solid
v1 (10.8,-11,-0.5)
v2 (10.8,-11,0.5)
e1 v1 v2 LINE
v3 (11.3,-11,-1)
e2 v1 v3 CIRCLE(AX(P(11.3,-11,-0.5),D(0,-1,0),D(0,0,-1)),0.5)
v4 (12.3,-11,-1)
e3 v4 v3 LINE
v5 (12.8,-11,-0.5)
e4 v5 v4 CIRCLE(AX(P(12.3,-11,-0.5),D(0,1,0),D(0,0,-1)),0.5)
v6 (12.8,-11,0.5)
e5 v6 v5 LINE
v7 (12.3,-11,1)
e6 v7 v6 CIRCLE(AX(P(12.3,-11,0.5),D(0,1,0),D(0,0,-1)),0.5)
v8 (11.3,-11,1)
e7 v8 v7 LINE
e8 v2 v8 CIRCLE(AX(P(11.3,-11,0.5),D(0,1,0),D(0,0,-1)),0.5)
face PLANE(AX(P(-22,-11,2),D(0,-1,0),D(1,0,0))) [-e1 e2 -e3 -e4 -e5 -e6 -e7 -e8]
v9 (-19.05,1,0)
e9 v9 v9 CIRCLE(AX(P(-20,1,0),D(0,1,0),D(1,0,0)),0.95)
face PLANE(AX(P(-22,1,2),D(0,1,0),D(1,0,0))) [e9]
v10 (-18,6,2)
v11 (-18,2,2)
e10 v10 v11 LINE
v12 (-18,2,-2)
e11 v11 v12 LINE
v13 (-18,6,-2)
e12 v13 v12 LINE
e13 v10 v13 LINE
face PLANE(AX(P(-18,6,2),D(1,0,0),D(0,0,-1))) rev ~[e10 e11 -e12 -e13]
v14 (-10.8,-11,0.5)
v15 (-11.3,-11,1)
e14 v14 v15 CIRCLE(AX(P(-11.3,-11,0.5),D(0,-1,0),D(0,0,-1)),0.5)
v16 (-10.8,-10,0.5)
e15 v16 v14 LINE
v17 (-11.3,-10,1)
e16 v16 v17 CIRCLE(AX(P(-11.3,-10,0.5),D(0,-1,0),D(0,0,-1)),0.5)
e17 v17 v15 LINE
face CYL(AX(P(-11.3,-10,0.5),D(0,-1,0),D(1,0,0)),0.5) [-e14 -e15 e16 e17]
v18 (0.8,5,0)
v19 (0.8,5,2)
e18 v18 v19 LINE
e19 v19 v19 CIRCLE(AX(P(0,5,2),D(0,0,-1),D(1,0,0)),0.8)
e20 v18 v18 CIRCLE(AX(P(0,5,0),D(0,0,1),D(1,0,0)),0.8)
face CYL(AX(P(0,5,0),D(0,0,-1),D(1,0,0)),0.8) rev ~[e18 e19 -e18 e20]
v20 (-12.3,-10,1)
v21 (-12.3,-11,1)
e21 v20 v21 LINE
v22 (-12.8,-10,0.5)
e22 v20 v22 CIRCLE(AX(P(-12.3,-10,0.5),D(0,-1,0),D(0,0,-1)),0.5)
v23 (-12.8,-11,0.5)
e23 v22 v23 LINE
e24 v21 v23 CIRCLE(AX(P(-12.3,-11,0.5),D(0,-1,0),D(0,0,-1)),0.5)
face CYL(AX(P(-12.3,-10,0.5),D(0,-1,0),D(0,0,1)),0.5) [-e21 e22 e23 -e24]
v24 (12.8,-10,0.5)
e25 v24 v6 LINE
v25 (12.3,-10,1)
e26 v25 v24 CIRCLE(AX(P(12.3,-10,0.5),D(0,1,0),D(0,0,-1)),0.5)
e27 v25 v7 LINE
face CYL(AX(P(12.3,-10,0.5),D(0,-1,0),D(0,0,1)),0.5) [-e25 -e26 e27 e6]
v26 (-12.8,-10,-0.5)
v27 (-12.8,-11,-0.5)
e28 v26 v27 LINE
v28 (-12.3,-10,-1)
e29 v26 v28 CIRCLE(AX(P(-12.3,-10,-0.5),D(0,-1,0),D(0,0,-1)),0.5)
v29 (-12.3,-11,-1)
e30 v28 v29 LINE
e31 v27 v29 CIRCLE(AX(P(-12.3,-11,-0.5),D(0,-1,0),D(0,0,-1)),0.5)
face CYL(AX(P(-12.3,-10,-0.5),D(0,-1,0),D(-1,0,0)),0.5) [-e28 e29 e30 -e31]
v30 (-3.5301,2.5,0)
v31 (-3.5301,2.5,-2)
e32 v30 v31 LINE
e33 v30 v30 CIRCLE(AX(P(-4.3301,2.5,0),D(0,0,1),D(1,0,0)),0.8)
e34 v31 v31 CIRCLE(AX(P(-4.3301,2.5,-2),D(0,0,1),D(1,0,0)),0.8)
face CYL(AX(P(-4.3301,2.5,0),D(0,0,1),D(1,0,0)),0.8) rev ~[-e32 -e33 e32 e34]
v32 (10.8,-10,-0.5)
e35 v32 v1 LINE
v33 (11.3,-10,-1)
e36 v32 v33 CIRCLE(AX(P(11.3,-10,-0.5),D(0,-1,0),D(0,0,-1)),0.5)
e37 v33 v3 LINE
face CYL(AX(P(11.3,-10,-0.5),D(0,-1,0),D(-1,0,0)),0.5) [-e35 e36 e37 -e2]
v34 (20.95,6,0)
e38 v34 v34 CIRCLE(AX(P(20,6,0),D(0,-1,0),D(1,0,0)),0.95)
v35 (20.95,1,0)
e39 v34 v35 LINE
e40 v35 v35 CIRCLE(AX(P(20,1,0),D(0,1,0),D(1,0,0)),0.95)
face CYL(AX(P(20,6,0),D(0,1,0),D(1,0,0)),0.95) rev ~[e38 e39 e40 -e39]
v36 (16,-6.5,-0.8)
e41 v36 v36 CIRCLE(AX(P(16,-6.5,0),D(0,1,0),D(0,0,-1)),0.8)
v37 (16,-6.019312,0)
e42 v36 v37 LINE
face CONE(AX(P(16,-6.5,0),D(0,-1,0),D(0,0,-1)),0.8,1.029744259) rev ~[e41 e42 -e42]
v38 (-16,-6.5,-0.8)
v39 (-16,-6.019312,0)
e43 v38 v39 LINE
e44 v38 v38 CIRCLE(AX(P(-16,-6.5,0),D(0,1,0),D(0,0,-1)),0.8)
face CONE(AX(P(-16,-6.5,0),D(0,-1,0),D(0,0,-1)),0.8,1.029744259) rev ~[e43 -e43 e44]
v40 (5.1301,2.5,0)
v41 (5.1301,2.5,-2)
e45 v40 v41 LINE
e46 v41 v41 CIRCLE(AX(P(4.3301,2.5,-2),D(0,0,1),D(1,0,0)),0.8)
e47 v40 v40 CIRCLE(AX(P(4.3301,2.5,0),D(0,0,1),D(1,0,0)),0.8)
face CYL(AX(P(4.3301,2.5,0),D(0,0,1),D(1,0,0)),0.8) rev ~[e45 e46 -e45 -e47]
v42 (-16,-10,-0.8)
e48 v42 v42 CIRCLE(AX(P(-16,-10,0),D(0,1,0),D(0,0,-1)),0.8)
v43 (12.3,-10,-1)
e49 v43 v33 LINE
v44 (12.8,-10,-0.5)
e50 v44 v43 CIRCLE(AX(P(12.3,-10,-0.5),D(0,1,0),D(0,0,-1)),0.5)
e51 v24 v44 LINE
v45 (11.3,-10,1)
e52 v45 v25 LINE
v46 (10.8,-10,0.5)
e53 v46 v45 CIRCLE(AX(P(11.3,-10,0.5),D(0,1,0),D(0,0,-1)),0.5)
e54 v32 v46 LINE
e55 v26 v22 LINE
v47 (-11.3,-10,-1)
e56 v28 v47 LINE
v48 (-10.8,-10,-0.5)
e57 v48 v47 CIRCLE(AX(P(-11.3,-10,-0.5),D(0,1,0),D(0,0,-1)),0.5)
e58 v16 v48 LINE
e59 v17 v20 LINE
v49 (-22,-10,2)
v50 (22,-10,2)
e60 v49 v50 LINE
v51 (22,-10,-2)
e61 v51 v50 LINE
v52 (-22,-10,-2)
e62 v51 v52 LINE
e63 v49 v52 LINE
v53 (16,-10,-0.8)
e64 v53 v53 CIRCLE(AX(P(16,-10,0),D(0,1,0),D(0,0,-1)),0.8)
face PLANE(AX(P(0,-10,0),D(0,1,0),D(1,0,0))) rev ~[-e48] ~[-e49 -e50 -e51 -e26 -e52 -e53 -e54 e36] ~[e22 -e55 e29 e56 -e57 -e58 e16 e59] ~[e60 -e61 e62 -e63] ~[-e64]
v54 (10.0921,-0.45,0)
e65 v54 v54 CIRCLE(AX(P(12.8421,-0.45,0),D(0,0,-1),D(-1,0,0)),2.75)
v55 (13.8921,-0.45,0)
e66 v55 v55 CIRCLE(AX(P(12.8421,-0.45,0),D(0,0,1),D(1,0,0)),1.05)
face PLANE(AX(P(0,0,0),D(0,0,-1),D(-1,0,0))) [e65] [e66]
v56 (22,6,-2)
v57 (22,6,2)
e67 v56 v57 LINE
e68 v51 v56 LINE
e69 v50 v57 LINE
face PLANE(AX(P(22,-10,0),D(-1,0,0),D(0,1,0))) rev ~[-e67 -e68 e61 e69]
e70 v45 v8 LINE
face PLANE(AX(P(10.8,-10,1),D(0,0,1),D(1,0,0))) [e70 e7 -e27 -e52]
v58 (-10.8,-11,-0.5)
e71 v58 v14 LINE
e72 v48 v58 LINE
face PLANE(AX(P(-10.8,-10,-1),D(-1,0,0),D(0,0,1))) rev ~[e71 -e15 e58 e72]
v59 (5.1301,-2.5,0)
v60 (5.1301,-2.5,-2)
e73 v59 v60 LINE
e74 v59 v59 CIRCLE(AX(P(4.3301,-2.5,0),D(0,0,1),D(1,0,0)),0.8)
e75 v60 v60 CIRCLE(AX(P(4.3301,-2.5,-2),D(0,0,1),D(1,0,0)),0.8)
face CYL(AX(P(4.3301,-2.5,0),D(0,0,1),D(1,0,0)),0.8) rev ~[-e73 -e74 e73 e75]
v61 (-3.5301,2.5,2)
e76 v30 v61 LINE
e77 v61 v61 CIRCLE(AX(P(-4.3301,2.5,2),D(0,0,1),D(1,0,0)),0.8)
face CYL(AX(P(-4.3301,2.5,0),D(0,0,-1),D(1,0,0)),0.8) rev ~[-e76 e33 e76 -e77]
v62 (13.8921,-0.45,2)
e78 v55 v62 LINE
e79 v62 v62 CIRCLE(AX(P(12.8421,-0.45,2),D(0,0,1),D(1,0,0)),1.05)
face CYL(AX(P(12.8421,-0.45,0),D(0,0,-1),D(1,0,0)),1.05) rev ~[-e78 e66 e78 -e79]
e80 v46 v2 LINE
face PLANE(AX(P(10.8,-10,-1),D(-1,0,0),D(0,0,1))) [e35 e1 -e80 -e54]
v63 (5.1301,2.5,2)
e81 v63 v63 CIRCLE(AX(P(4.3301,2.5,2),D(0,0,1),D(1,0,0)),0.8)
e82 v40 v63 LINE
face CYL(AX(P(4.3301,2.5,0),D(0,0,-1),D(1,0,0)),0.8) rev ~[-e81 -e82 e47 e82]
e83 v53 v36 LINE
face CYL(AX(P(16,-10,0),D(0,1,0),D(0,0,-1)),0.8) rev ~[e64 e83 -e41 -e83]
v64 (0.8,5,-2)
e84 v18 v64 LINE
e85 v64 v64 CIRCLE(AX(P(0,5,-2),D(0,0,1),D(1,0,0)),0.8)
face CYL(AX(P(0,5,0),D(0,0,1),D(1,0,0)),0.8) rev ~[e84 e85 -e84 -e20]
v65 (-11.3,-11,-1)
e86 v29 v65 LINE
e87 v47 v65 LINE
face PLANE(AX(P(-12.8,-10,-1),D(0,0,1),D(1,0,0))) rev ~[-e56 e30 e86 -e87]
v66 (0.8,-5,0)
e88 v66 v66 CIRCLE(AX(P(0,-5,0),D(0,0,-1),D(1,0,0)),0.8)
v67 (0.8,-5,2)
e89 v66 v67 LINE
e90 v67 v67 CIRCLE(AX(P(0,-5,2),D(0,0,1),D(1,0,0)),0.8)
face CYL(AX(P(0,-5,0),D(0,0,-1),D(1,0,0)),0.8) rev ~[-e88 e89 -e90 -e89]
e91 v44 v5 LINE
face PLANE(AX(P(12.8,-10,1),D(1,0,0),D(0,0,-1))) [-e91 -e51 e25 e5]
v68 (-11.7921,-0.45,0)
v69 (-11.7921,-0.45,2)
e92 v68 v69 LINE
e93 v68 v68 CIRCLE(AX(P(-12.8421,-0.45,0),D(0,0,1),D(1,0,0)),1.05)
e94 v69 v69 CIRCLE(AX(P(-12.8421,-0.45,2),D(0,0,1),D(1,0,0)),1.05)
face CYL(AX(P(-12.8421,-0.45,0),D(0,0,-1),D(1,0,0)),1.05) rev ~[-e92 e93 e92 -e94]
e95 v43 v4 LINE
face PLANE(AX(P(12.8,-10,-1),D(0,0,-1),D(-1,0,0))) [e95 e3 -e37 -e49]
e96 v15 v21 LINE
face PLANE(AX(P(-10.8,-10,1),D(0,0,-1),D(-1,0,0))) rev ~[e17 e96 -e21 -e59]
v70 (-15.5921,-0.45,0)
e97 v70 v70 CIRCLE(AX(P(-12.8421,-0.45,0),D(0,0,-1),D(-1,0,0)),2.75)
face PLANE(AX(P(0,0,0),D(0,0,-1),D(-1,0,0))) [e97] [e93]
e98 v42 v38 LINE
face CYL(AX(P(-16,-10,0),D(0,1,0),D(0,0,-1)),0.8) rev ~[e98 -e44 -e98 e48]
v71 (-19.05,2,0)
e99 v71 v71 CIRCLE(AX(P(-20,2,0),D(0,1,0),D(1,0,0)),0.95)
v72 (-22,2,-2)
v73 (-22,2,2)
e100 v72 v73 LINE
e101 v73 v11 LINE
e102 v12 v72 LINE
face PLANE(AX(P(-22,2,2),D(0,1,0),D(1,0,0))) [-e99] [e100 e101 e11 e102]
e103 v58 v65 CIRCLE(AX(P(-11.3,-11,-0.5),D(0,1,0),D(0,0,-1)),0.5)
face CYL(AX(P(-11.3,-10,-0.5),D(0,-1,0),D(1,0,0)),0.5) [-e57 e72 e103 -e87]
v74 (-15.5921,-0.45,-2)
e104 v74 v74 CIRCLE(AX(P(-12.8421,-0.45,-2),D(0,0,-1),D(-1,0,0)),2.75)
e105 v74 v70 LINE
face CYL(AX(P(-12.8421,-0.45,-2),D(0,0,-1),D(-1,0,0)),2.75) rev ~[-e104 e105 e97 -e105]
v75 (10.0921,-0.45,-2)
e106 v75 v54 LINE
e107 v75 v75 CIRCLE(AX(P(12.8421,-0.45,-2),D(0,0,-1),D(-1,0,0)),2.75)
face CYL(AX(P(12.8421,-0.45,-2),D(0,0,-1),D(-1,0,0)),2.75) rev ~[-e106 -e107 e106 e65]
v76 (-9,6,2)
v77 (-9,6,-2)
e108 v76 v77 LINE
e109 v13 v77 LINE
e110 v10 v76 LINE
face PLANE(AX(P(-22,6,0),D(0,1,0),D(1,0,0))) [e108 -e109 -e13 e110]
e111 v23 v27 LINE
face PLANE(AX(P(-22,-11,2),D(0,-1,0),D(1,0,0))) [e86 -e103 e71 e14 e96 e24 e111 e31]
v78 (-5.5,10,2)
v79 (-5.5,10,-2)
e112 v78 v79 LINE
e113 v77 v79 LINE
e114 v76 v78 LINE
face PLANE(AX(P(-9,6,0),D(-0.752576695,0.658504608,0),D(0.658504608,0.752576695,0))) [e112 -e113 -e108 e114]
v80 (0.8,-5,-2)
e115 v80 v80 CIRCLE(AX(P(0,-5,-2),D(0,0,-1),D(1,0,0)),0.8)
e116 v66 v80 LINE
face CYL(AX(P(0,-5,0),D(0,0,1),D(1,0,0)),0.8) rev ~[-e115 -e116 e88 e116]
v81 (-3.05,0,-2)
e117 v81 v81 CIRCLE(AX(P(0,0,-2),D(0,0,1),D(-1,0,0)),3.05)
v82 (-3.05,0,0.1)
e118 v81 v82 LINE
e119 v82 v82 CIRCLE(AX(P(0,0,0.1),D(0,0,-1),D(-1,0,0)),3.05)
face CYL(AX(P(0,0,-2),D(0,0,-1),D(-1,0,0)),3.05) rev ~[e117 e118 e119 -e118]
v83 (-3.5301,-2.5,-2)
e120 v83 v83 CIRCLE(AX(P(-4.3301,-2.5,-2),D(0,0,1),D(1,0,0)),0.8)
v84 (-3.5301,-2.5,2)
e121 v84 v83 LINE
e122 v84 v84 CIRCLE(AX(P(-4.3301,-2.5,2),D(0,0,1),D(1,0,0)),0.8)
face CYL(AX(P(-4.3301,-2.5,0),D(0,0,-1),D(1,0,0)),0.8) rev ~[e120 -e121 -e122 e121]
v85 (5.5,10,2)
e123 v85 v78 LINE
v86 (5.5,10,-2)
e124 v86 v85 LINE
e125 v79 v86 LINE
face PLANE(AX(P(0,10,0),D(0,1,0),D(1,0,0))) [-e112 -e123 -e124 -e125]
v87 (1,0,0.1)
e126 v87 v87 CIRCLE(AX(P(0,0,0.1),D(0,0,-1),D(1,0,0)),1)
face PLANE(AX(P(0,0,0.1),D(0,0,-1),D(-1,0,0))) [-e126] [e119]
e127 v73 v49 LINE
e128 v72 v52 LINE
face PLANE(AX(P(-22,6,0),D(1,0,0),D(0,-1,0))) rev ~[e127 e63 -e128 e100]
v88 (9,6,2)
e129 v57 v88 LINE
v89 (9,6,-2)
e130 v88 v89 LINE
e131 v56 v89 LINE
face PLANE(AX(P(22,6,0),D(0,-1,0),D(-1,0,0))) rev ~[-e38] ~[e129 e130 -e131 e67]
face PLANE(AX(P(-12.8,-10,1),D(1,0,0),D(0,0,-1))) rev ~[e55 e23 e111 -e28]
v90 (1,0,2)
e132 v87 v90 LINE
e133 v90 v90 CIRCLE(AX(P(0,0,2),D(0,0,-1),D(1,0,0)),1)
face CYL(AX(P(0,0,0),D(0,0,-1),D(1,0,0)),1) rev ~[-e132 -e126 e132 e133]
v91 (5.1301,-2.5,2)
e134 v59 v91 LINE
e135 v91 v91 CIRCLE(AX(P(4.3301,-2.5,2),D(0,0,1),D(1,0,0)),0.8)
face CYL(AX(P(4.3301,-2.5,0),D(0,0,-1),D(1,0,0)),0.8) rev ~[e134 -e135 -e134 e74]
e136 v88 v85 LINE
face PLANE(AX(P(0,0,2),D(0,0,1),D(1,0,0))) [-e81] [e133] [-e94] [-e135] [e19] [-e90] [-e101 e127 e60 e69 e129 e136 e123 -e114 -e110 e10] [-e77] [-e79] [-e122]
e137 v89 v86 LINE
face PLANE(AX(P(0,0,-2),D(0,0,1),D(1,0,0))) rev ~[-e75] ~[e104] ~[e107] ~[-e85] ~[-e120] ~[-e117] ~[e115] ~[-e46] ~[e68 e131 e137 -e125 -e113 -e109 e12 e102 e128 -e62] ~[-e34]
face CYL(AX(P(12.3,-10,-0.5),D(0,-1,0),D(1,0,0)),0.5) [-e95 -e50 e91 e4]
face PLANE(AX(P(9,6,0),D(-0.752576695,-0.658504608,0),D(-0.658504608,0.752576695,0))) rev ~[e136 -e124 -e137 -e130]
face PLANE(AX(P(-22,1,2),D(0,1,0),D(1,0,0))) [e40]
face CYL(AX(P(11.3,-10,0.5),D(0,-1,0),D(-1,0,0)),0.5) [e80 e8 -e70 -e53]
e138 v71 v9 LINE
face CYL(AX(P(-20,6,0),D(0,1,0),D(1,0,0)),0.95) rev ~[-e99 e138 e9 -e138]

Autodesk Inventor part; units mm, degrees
ref_plane "YZ Plane" through (0, 0, 0) normal (1, 0, 0) x (0, 1, 0)
ref_plane "XZ Plane" through (0, 0, 0) normal (0, 1, 0) x (-1, 0, 0)
ref_plane "XY Plane" through (0, 0, 0) normal (0, 0, 1) x (1, 0, 0)
sketch "構築線" plane through (0, 0, 0) normal (0, 0, 1) x (1, 0, 0)
  circle A0 centre (0, 0) radius 8.5
  circle A1 centre (0, 0) radius 2.8 construction
  circle A2 centre (0, 0) radius 5 construction
  line L0 (0, -10) -> (-25, -10) construction
  line L1 (0, -13) -> (-25, -13) construction
  circle A3 centre (-12.8421, -0.45) radius 10.05 construction
  circle A4 centre (-12.8421, -0.45) radius 12.55 construction
  circle A5 centre (0, 5) radius 0.8
  circle A6 centre (-4.3301, 2.5) radius 0.8
  circle A7 centre (-4.3301, -2.5) radius 0.8
  circle A8 centre (0, -5) radius 0.8
  circle A9 centre (4.3301, -2.5) radius 0.8
  circle A10 centre (4.3301, 2.5) radius 0.8
  line L2 (25, -10) -> (0, -10) construction
  circle A11 centre (12.8421, -0.45) radius 10.05 construction
  circle A12 centre (12.8421, -0.45) radius 12.55 construction
  line L3 (0, -13) -> (25, -13) construction
  line L4 (-22, -10) -> (0, -10)
  line L5 (0, 25) -> (0, -25)
  line L6 (0, -10) -> (22, -10)
  circle A13 centre (0, 0) radius 3
  circle A14 centre (0, 0) radius 1
  circle A15 centre (12.8421, -0.45) radius 1.05
  circle A16 centre (-12.8421, -0.45) radius 1.05
  circle A17 centre (12.8421, -0.45) radius 2.75
  circle A18 centre (-12.8421, -0.45) radius 2.75
  line L7 (-22, 6) -> (-22, -10)
  line L8 (22, -10) -> (22, 6)
  line L9 (-22, 6) -> (-9, 6)
  line L10 (-9, 6) -> (-5.5, 10)
  line L11 (22, 6) -> (9, 6)
  line L12 (9, 6) -> (5.5, 10)
  line L13 (-5.5, 10) -> (5.5, 10)
  point P0 (-5.5355, 6.4504)
  point P1 (5.5355, 6.4504)
  dimension "d22" = 20.1
  dimension "d41" = 20.1
  dimension "d0" = 17
  dimension "d1" = 5.6
  dimension "d2" = 10
  dimension "d12" = 25
  dimension "d13" = 10
  dimension "d14" = 0
  dimension "d17" = 0
  dimension "d18" = 25
  dimension "d19" = 3
  dimension "d23" = 25.1
  dimension "d29" = 1.6
  dimension "d30" = 0
  dimension "d31" = 5
  dimension "d34" = 360
  dimension "d38" = 25
  dimension "d42" = 25.1
  dimension "d43" = 25
  dimension "d46" = 22
  dimension "d49" = 50
  dimension "d50" = 25
  dimension "d51" = 25
  dimension "d52" = 22
  dimension "d58" = 6
  dimension "d59" = 2
  dimension "d99" = 2.1
  dimension "d100" = 2.1
  dimension "d105" = 5.5
  dimension "d106" = 5.5
  dimension "d253" = 16
  dimension "d254" = 16
  dimension "d255" = 13
  dimension "d257" = 13
  dimension "d258" = 3.5
  dimension "d259" = 3.5
  dimension "d261" = 4
extrude "押し出し11" add sketch "構築線" along normal mid plane 4 contours A0 L5 A8 A13 A5 | A0 L5 L13 L12 L11 L8 L6 | L5 A5 A13 A8 A0 | A0 L5 L4 L7 L9 L10 L13 | A13 L5 A14 | L5 A14 A13 | A17 | A18
sketch "固定穴" plane through (0, 0, -2) normal (0, 0, -1) x (-1, 0, 0)
  circle A0 centre (0, 0) radius 8.5
  line L0 (0, -8.6) -> (-25, -8.6) construction
  line L1 (25, -8.6) -> (0, -8.6) construction
  line L2 (0, 25) -> (0, -25)
  circle A1 centre (12.8421, -0.45) radius 2.75
  circle A2 centre (-12.8421, -0.45) radius 2.75
  circle A3 centre (0, 0) radius 1 projected
  circle A4 centre (-12.8421, -0.45) radius 1.05 projected
  circle A5 centre (12.8421, -0.45) radius 1.05 projected
  circle A6 centre (0, 0) radius 3.05
  dimension "d180" = 17
  dimension "d183" = 25
  dimension "d195" = 25
  dimension "d200" = 50
  dimension "d208" = 5.5
  dimension "d209" = 5.5
  dimension "d216" = 6.1
extrude "押し出し19" cut sketch "固定穴" against normal blind 2 contours A1 | A2 | A4 | A5
extrude "押し出し21" cut sketch "固定穴" against normal blind 2.1 contours A6 L2 A3 | L2 A3 A6
sketch "ねじ穴+固定(基板)" plane through (-22, -10, 2) normal (0, -1, 0) x (1, 0, 0)
  circle A0 centre (38, -2) radius 1
  line L0 (44, 0) -> (44, -4) projected
  line L1 (44, -2) -> (0, -2) construction
  line L2 (0, 0) -> (0, -4) projected
  circle A1 centre (6, -2) radius 1
  line L3 (34.8, -3) -> (32.8, -3)
  line L4 (32.8, -3) -> (32.8, -1)
  line L5 (32.8, -1) -> (34.8, -1)
  line L6 (34.8, -1) -> (34.8, -3)
  line L7 (34.8, -3) -> (32.8, -1) construction
  line L8 (32.8, -3) -> (34.8, -1) construction
  line L9 (11.2, -1) -> (9.2, -1)
  line L10 (9.2, -1) -> (9.2, -3)
  line L11 (9.2, -3) -> (11.2, -3)
  line L12 (11.2, -3) -> (11.2, -1)
  line L13 (11.2, -1) -> (9.2, -3) construction
  line L14 (9.2, -1) -> (11.2, -3) construction
  point P0 (22, -2)
  point P1 (33.8, -2)
  point P2 (33.8, -2)
  point P3 (10.2, -2)
  point P4 (10.2, -2)
  dimension "d219" = 2
  dimension "d220" = 6
  dimension "d221" = 6
  dimension "d222" = 2
  dimension "d223" = 2
  dimension "d224" = 2
  dimension "d225" = 4.2
  dimension "d226" = 2
  dimension "d227" = 2
  dimension "d228" = 4.2
hole "ねじ穴(基板)" at (16, -10, 0) at (-16, -10, 0) direction (0, 1, 0) diameter 1.6 depth 3.5 tip angle 118
extrude "押し出し22" add sketch "ねじ穴+固定(基板)" along normal blind 1 contours L3 L4 L5 L6 | L12 L11 L10 L9
fillet "フィレット1" radius 0.5 4 edges at (12.8, -10.5, -1) (12.8, -10.5, 1) (10.8, -10.5, -1) (10.8, -10.5, 1)
fillet "フィレット2" radius 0.5 4 edges at (-12.8, -10.5, -1) (-12.8, -10.5, 1) (-10.8, -10.5, -1) (-10.8, -10.5, 1)
sketch "スケッチ20" plane through (-22, 6, 2) normal (0, 1, 0) x (1, 0, 0)
  line L0 (0, 0) -> (0, 4) projected
  line L1 (13, 0) -> (0, 0) projected
  line L2 (13, 0) -> (13, 4) projected
  line L3 (0, 4) -> (13, 4) projected
  line L4 (31, 0) -> (31, 4) projected
  line L5 (44, 0) -> (31, 0) projected
  line L6 (44, 0) -> (44, 4) projected
  line L7 (31, 4) -> (44, 4) projected
  line L8 (0, 0) -> (4, 0) construction
  line L9 (4, 0) -> (4, 4) construction
  line L10 (4, 4) -> (0, 4) construction
  line L11 (0, 4) -> (0, 0) construction
  line L12 (44, 0) -> (40, 0) construction
  line L13 (40, 0) -> (40, 4) construction
  line L14 (40, 4) -> (44, 4) construction
  line L15 (44, 4) -> (44, 0) construction
  line L16 (4, 0) -> (0, 4) construction
  line L17 (0, 0) -> (4, 4) construction
  line L18 (40, 0) -> (44, 4) construction
  line L19 (44, 0) -> (44, 4) construction
  line L20 (44, 0) -> (40, 4) construction
  circle A0 centre (2, 2) radius 0.95
  circle A1 centre (42, 2) radius 0.95
  point P0 (22, 2)
  dimension "d290" = 4
  dimension "d291" = 4
  dimension "d292" = 4
  dimension "d293" = 4
  dimension "d294" = 1.9
  dimension "d295" = 1.9
extrude "押し出し28" cut sketch "スケッチ20" against normal blind 5 contours A0 | A1
sketch "外形側面（dxf出力用）" plane through (0, 0, 2) normal (0, 0, 1) x (1, 0, 0)
  line L0 (-10, 6) -> (-5.5, 10)
  line L1 (-5.5, 10) -> (-10, 6)
  line L2 (-10, 6) -> (-22, 6)
  line L3 (-22, 6) -> (-22, -11)
  line L4 (-22, -11) -> (22, -11)
  line L5 (22, -11) -> (22, 6)
  line L6 (22, 6) -> (10, 6) projected
  line L7 (5.5, 10) -> (-5.5, 10) projected
  line L8 (10, 6) -> (5.5, 10)
  line L9 (5.5, 10) -> (-5.5, 10)
  line L10 (22, 6) -> (10, 6)
  circle A0 centre (0, 0) radius 2.8 projected
  circle A1 centre (4.3301, 2.5) radius 0.8 projected
  circle A2 centre (4.3301, -2.5) radius 0.8 projected
  circle A3 centre (0, -5) radius 0.8 projected
  circle A4 centre (-4.3301, -2.5) radius 0.8 projected
  circle A5 centre (-4.3301, 2.5) radius 0.8 projected
  circle A6 centre (0, 5) radius 0.8 projected
  circle A7 centre (0, 0) radius 8.5 projected
  circle A8 centre (0, 0) radius 1 projected
  circle A9 centre (-12.8421, -0.45) radius 1.05 projected
  circle A10 centre (-12.8421, -0.45) radius 2.75 projected
  circle A11 centre (12.8421, -0.45) radius 1.05 projected
  circle A12 centre (12.8421, -0.45) radius 2.75 projected
  dimension "d2" = 10
sketch "外形底面（dxf出力用）" plane through (-22, -10, 2) normal (0, -1, 0) x (1, 0, 0)
  arc A0 (11.2, -1.5) -> (10.7, -1) centre (10.7, -1.5) ccw projected
  line L0 (10.7, -1) -> (9.7, -1) projected
  arc A1 (9.7, -1) -> (9.2, -1.5) centre (9.7, -1.5) ccw projected
  line L1 (9.2, -1.5) -> (9.2, -2.5) projected
  arc A2 (9.2, -2.5) -> (9.7, -3) centre (9.7, -2.5) ccw projected
  line L2 (9.7, -3) -> (10.7, -3) projected
  arc A3 (10.7, -3) -> (11.2, -2.5) centre (10.7, -2.5) ccw projected
  line L3 (11.2, -2.5) -> (11.2, -1.5) projected
  arc A4 (33.3, -1) -> (32.8, -1.5) centre (33.3, -1.5) ccw projected
  line L4 (32.8, -1.5) -> (32.8, -2.5) projected
  arc A5 (32.8, -2.5) -> (33.3, -3) centre (33.3, -2.5) ccw projected
  line L5 (33.3, -3) -> (34.3, -3) projected
  arc A6 (34.3, -3) -> (34.8, -2.5) centre (34.3, -2.5) ccw projected
  line L6 (34.8, -2.5) -> (34.8, -1.5) projected
  arc A7 (34.8, -1.5) -> (34.3, -1) centre (34.3, -1.5) ccw projected
  line L7 (34.3, -1) -> (33.3, -1) projected
  circle A8 centre (38, -2) radius 0.8 projected
  circle A9 centre (6, -2) radius 0.8 projected
  line L8 (31, -4) -> (44, -4) projected
  line L9 (0, -4) -> (13, -4) projected
  line L10 (13, 0) -> (0, 0) projected
  line L11 (44, 0) -> (31, 0) projected
  line L12 (0, 0) -> (0, -4) projected
  line L13 (44, 0) -> (44, -4) projected
  line L14 (31, 0) -> (31, -4) projected
  line L15 (31, -4) -> (31, 0)
  line L16 (31, 0) -> (13, 0)
  line L17 (13, 0) -> (13, -4) projected
  line L18 (13, 0) -> (13, -4)
  line L19 (13, -4) -> (31, -4)
  point P0 (22, -2)
sketch "外形上面(dxf出力用)" plane through (-22, 6, 2) normal (0, 1, 0) x (1, 0, 0)
  line L0 (44, 4) -> (0, 4) projected
  line L1 (44, 0) -> (44, 4) projected
  line L2 (0, 0) -> (44, 0) projected
  line L3 (0, 0) -> (0, 4) projected
  circle A0 centre (2, 2) radius 0.95 projected
  circle A1 centre (42, 2) radius 0.95 projected
  point P0 (22, 2)
  point P1 (13, 4)
sketch "スケッチ25" plane through (0, 0, -2) normal (0, 0, -1) x (-1, 0, 0)
  circle A0 centre (-12.8421, -0.45) radius 1.05 projected
  circle A1 centre (0, 0) radius 1 projected
  circle A2 centre (12.8421, -0.45) radius 1.05 projected
  line L0 (12.3, -11) -> (11.3, -11) projected
  line L1 (-11.3, -11) -> (-12.3, -11) projected
  line L2 (5.5, 10) -> (-5.5, 10) projected
  line L3 (-5.5, 10) -> (-9, 6) projected
  line L4 (-9, 6) -> (-22, 6) projected
  line L5 (-22, 6) -> (-22, -10) projected
  line L6 (9, 6) -> (5.5, 10) projected
  line L7 (22, 6) -> (9, 6) projected
  line L8 (22, -10) -> (22, 6) projected
  circle A3 centre (0, 5) radius 0.8 projected
  circle A4 centre (-4.3301, 2.5) radius 0.8 projected
  circle A5 centre (-4.3301, -2.5) radius 0.8 projected
  circle A6 centre (0, -5) radius 0.8 projected
  circle A7 centre (4.3301, -2.5) radius 0.8 projected
  circle A8 centre (4.3301, 2.5) radius 0.8 projected
  line L9 (-22, -10) -> (-22, -11)
  line L10 (-22, -11) -> (-12.3, -11)
  line L11 (-11.3, -11) -> (11.3, -11)
  line L12 (12.3, -11) -> (22, -11)
  line L13 (22, -11) -> (22, -10)
  circle A9 centre (12.8421, -0.45) radius 2.75 projected
  circle A10 centre (-12.8421, -0.45) radius 2.75 projected
  circle A11 centre (0, 0) radius 3.05 projected
sketch "冶具" plane through (0, 0, 2) normal (0, 0, 1) x (1, 0, 0)
  line L0 (-19, 6) -> (-9, 6)
  line L1 (-5.5, 10) -> (5.5, 10)
  line L2 (9, 6) -> (19, 6)
  line L3 (-11.3, -11) -> (-12.3, -11) construction
  line L4 (12.3, -11) -> (11.3, -11) construction
  line L5 (22, 6) -> (22, -11)
  line L6 (-22, 6) -> (-22, -11)
  line L7 (-19, -11) -> (19, -11)
  line L8 (-22, 6) -> (-22, 7.5)
  line L9 (-22, 7.5) -> (-19, 7.5)
  line L10 (-19, 7.5) -> (-19, 6)
  line L11 (-5.5, 10) -> (-7, 10)
  line L12 (-7, 10) -> (-7, 8.2857)
  line L13 (-7, 8.2857) -> (-9, 6)
  line L14 (-5.5, 10) -> (5.5, 10) projected
  line L15 (5.5, 10) -> (7, 10)
  line L16 (7, 10) -> (7, 8.2857)
  line L17 (7, 8.2857) -> (9, 6)
  line L18 (19, -11) -> (19, -12.5)
  line L19 (19, -12.5) -> (22, -12.5)
  line L20 (22, -12.5) -> (22, -11)
  line L21 (-22, -11) -> (-22, -12.5)
  line L22 (-22, -12.5) -> (-19, -12.5)
  line L23 (-19, -12.5) -> (-19, -11)
  line L24 (22, 6) -> (22, 7.5)
  line L25 (22, 7.5) -> (19, 7.5)
  line L26 (19, 7.5) -> (19, 6)
  point P0 (0, 0)
  dimension "d310" = 3
  dimension "d311" = 3
  dimension "d316" = 1.5
  dimension "d317" = 1.5
  dimension "d318" = 1.5
  dimension "d319" = 1.5
  dimension "d320" = 38
  dimension "d321" = 17
  dimension "d322" = 17
  dimension "d323" = 11
  dimension "d324" = 10
  dimension "d325" = 10
  dimension "d326" = 3
  dimension "d327" = 3
  dimension "d328" = 2
  dimension "d329" = 2
  dimension "d330" = 1.5
  dimension "d331" = 1.5
sketch "スケッチ27" plane through (-22, -10, 2) normal (0, -1, 0) x (1, 0, 0)
  line L0 (32.8, -2.5) -> (32.8, -1.5) construction
  arc A0 (33.3, -1) -> (32.8, -1.5) centre (33.3, -1.5) ccw construction
  line L1 (33.3, -1) -> (34.3, -1) construction
  arc A1 (34.8, -1.5) -> (34.3, -1) centre (34.3, -1.5) ccw construction
  line L2 (34.8, -1.5) -> (34.8, -2.5) construction
  arc A2 (34.3, -3) -> (34.8, -2.5) centre (34.3, -2.5) ccw construction
  line L3 (34.3, -3) -> (33.3, -3) construction
  arc A3 (32.8, -2.5) -> (33.3, -3) centre (33.3, -2.5) ccw construction
  line L4 (11.2, -1.5) -> (11.2, -2.5) construction
  arc A4 (10.7, -3) -> (11.2, -2.5) centre (10.7, -2.5) ccw construction
  line L5 (10.7, -3) -> (9.7, -3) construction
  arc A5 (9.2, -2.5) -> (9.7, -3) centre (9.7, -2.5) ccw construction
  line L6 (9.2, -2.5) -> (9.2, -1.5) construction
  arc A6 (9.7, -1) -> (9.2, -1.5) centre (9.7, -1.5) ccw construction
  line L7 (9.7, -1) -> (10.7, -1) construction
  arc A7 (11.2, -1.5) -> (10.7, -1) centre (10.7, -1.5) ccw construction
  circle A8 centre (38, -2) radius 0.8 construction
  circle A9 centre (6, -2) radius 0.8 construction
  line L8 (44, 0) -> (44, -4) construction
  line L9 (0, 0) -> (44, 0) construction
  line L10 (0, 0) -> (0, -4) construction
  line L11 (44, -4) -> (0, -4) construction
  line L12 (0, 0) -> (0, 1.5)
  line L13 (0, 1.5) -> (3, 1.5)
  line L14 (3, 1.5) -> (3, 0)
  line L15 (3, 0) -> (41, 0)
  line L16 (0, 0) -> (44, 0) projected
  line L17 (44, 0) -> (44, 1.5)
  line L18 (44, 1.5) -> (41, 1.5)
  line L19 (41, 1.5) -> (41, 0)
  line L20 (0, -4) -> (0, -5.5)
  line L21 (0, -5.5) -> (3, -5.5)
  line L22 (3, -5.5) -> (3, -4)
  line L23 (44, -4) -> (44, -5.5)
  line L24 (44, -5.5) -> (41, -5.5)
  line L25 (41, -5.5) -> (41, -4)
  line L26 (41, -4) -> (3, -4)
  line L27 (44, 0) -> (44, -4)
  line L28 (0, 0) -> (0, -4)
  circle A10 centre (42, -2) radius 0.95 projected
  circle A11 centre (2, -2) radius 0.95 projected
  point P0 (22, -2)
  dimension "d332" = 1.5
  dimension "d333" = 3
  dimension "d334" = 1.5
  dimension "d335" = 3
  dimension "d336" = 1.5
  dimension "d337" = 3
  dimension "d338" = 1.5
  dimension "d339" = 3
sketch "スケッチ28" plane through (-5.5, 10, 2) normal (0, 1, 0) x (1, 0, 0)
  line L0 (14.5, 0) -> (14.5, 4) projected
  line L1 (-3.5, 0) -> (-3.5, 4) projected
  line L2 (-3.5, 4) -> (-3.5, 5.5)
  line L3 (-3.5, 5.5) -> (-0.5, 5.5)
  line L4 (-0.5, 5.5) -> (-0.5, 4)
  line L5 (-3.5, 0) -> (-3.5, -1.5)
  line L6 (-3.5, -1.5) -> (-0.5, -1.5)
  line L7 (-0.5, -1.5) -> (-0.5, 0)
  line L8 (14.5, 4) -> (14.5, 5.5)
  line L9 (14.5, 5.5) -> (11.5, 5.5)
  line L10 (11.5, 5.5) -> (11.5, 4)
  line L11 (14.5, 0) -> (14.5, -1.5)
  line L12 (14.5, -1.5) -> (11.5, -1.5)
  line L13 (11.5, -1.5) -> (11.5, 0)
  line L14 (11.5, 0) -> (-0.5, 0)
  line L15 (-0.5, 4) -> (11.5, 4)
  circle A0 centre (21.5, 2) radius 0.8 projected
  circle A1 centre (-10.5, 2) radius 0.8 projected
  line L16 (17.8, 1) -> (16.8, 1) projected
  arc A2 (17.8, 1) -> (18.3, 1.5) centre (17.8, 1.5) ccw projected
  line L17 (18.3, 2.5) -> (18.3, 1.5) projected
  arc A3 (18.3, 2.5) -> (17.8, 3) centre (17.8, 2.5) ccw projected
  line L18 (16.8, 3) -> (17.8, 3) projected
  arc A4 (16.8, 3) -> (16.3, 2.5) centre (16.8, 2.5) ccw projected
  line L19 (16.3, 1.5) -> (16.3, 2.5) projected
  arc A5 (16.3, 1.5) -> (16.8, 1) centre (16.8, 1.5) ccw projected
  line L20 (-5.8, 1) -> (-6.8, 1) projected
  arc A6 (-5.8, 1) -> (-5.3, 1.5) centre (-5.8, 1.5) ccw projected
  line L21 (-5.3, 2.5) -> (-5.3, 1.5) projected
  arc A7 (-5.3, 2.5) -> (-5.8, 3) centre (-5.8, 2.5) ccw projected
  line L22 (-6.8, 3) -> (-5.8, 3) projected
  arc A8 (-6.8, 3) -> (-7.3, 2.5) centre (-6.8, 2.5) ccw projected
  line L23 (-7.3, 1.5) -> (-7.3, 2.5) projected
  arc A9 (-7.3, 1.5) -> (-6.8, 1) centre (-6.8, 1.5) ccw projected
  point P0 (5.5, 2)
  dimension "d340" = 1.5
  dimension "d341" = 3
  dimension "d342" = 1.5
  dimension "d343" = 3
  dimension "d344" = 1.5
  dimension "d345" = 3
  dimension "d346" = 1.5
  dimension "d347" = 3
sketch "スケッチ29" plane through (-22, 6, 2) normal (0, 1, 0) x (1, 0, 0)
  line L0 (0, 0) -> (44, 0) projected
  line L1 (0, 0) -> (4, 0)
  line L2 (4, 0) -> (4, 4)
  line L3 (4, 4) -> (0, 4)
  line L4 (0, 4) -> (0, 0)
  point P0 (22, 2)
  dimension "d348" = 4
  dimension "d349" = 4
extrude "押し出し29" cut sketch "スケッチ29" against normal blind 4
equation "\"d18\" = d12"
properties part number "m_mount_l"
